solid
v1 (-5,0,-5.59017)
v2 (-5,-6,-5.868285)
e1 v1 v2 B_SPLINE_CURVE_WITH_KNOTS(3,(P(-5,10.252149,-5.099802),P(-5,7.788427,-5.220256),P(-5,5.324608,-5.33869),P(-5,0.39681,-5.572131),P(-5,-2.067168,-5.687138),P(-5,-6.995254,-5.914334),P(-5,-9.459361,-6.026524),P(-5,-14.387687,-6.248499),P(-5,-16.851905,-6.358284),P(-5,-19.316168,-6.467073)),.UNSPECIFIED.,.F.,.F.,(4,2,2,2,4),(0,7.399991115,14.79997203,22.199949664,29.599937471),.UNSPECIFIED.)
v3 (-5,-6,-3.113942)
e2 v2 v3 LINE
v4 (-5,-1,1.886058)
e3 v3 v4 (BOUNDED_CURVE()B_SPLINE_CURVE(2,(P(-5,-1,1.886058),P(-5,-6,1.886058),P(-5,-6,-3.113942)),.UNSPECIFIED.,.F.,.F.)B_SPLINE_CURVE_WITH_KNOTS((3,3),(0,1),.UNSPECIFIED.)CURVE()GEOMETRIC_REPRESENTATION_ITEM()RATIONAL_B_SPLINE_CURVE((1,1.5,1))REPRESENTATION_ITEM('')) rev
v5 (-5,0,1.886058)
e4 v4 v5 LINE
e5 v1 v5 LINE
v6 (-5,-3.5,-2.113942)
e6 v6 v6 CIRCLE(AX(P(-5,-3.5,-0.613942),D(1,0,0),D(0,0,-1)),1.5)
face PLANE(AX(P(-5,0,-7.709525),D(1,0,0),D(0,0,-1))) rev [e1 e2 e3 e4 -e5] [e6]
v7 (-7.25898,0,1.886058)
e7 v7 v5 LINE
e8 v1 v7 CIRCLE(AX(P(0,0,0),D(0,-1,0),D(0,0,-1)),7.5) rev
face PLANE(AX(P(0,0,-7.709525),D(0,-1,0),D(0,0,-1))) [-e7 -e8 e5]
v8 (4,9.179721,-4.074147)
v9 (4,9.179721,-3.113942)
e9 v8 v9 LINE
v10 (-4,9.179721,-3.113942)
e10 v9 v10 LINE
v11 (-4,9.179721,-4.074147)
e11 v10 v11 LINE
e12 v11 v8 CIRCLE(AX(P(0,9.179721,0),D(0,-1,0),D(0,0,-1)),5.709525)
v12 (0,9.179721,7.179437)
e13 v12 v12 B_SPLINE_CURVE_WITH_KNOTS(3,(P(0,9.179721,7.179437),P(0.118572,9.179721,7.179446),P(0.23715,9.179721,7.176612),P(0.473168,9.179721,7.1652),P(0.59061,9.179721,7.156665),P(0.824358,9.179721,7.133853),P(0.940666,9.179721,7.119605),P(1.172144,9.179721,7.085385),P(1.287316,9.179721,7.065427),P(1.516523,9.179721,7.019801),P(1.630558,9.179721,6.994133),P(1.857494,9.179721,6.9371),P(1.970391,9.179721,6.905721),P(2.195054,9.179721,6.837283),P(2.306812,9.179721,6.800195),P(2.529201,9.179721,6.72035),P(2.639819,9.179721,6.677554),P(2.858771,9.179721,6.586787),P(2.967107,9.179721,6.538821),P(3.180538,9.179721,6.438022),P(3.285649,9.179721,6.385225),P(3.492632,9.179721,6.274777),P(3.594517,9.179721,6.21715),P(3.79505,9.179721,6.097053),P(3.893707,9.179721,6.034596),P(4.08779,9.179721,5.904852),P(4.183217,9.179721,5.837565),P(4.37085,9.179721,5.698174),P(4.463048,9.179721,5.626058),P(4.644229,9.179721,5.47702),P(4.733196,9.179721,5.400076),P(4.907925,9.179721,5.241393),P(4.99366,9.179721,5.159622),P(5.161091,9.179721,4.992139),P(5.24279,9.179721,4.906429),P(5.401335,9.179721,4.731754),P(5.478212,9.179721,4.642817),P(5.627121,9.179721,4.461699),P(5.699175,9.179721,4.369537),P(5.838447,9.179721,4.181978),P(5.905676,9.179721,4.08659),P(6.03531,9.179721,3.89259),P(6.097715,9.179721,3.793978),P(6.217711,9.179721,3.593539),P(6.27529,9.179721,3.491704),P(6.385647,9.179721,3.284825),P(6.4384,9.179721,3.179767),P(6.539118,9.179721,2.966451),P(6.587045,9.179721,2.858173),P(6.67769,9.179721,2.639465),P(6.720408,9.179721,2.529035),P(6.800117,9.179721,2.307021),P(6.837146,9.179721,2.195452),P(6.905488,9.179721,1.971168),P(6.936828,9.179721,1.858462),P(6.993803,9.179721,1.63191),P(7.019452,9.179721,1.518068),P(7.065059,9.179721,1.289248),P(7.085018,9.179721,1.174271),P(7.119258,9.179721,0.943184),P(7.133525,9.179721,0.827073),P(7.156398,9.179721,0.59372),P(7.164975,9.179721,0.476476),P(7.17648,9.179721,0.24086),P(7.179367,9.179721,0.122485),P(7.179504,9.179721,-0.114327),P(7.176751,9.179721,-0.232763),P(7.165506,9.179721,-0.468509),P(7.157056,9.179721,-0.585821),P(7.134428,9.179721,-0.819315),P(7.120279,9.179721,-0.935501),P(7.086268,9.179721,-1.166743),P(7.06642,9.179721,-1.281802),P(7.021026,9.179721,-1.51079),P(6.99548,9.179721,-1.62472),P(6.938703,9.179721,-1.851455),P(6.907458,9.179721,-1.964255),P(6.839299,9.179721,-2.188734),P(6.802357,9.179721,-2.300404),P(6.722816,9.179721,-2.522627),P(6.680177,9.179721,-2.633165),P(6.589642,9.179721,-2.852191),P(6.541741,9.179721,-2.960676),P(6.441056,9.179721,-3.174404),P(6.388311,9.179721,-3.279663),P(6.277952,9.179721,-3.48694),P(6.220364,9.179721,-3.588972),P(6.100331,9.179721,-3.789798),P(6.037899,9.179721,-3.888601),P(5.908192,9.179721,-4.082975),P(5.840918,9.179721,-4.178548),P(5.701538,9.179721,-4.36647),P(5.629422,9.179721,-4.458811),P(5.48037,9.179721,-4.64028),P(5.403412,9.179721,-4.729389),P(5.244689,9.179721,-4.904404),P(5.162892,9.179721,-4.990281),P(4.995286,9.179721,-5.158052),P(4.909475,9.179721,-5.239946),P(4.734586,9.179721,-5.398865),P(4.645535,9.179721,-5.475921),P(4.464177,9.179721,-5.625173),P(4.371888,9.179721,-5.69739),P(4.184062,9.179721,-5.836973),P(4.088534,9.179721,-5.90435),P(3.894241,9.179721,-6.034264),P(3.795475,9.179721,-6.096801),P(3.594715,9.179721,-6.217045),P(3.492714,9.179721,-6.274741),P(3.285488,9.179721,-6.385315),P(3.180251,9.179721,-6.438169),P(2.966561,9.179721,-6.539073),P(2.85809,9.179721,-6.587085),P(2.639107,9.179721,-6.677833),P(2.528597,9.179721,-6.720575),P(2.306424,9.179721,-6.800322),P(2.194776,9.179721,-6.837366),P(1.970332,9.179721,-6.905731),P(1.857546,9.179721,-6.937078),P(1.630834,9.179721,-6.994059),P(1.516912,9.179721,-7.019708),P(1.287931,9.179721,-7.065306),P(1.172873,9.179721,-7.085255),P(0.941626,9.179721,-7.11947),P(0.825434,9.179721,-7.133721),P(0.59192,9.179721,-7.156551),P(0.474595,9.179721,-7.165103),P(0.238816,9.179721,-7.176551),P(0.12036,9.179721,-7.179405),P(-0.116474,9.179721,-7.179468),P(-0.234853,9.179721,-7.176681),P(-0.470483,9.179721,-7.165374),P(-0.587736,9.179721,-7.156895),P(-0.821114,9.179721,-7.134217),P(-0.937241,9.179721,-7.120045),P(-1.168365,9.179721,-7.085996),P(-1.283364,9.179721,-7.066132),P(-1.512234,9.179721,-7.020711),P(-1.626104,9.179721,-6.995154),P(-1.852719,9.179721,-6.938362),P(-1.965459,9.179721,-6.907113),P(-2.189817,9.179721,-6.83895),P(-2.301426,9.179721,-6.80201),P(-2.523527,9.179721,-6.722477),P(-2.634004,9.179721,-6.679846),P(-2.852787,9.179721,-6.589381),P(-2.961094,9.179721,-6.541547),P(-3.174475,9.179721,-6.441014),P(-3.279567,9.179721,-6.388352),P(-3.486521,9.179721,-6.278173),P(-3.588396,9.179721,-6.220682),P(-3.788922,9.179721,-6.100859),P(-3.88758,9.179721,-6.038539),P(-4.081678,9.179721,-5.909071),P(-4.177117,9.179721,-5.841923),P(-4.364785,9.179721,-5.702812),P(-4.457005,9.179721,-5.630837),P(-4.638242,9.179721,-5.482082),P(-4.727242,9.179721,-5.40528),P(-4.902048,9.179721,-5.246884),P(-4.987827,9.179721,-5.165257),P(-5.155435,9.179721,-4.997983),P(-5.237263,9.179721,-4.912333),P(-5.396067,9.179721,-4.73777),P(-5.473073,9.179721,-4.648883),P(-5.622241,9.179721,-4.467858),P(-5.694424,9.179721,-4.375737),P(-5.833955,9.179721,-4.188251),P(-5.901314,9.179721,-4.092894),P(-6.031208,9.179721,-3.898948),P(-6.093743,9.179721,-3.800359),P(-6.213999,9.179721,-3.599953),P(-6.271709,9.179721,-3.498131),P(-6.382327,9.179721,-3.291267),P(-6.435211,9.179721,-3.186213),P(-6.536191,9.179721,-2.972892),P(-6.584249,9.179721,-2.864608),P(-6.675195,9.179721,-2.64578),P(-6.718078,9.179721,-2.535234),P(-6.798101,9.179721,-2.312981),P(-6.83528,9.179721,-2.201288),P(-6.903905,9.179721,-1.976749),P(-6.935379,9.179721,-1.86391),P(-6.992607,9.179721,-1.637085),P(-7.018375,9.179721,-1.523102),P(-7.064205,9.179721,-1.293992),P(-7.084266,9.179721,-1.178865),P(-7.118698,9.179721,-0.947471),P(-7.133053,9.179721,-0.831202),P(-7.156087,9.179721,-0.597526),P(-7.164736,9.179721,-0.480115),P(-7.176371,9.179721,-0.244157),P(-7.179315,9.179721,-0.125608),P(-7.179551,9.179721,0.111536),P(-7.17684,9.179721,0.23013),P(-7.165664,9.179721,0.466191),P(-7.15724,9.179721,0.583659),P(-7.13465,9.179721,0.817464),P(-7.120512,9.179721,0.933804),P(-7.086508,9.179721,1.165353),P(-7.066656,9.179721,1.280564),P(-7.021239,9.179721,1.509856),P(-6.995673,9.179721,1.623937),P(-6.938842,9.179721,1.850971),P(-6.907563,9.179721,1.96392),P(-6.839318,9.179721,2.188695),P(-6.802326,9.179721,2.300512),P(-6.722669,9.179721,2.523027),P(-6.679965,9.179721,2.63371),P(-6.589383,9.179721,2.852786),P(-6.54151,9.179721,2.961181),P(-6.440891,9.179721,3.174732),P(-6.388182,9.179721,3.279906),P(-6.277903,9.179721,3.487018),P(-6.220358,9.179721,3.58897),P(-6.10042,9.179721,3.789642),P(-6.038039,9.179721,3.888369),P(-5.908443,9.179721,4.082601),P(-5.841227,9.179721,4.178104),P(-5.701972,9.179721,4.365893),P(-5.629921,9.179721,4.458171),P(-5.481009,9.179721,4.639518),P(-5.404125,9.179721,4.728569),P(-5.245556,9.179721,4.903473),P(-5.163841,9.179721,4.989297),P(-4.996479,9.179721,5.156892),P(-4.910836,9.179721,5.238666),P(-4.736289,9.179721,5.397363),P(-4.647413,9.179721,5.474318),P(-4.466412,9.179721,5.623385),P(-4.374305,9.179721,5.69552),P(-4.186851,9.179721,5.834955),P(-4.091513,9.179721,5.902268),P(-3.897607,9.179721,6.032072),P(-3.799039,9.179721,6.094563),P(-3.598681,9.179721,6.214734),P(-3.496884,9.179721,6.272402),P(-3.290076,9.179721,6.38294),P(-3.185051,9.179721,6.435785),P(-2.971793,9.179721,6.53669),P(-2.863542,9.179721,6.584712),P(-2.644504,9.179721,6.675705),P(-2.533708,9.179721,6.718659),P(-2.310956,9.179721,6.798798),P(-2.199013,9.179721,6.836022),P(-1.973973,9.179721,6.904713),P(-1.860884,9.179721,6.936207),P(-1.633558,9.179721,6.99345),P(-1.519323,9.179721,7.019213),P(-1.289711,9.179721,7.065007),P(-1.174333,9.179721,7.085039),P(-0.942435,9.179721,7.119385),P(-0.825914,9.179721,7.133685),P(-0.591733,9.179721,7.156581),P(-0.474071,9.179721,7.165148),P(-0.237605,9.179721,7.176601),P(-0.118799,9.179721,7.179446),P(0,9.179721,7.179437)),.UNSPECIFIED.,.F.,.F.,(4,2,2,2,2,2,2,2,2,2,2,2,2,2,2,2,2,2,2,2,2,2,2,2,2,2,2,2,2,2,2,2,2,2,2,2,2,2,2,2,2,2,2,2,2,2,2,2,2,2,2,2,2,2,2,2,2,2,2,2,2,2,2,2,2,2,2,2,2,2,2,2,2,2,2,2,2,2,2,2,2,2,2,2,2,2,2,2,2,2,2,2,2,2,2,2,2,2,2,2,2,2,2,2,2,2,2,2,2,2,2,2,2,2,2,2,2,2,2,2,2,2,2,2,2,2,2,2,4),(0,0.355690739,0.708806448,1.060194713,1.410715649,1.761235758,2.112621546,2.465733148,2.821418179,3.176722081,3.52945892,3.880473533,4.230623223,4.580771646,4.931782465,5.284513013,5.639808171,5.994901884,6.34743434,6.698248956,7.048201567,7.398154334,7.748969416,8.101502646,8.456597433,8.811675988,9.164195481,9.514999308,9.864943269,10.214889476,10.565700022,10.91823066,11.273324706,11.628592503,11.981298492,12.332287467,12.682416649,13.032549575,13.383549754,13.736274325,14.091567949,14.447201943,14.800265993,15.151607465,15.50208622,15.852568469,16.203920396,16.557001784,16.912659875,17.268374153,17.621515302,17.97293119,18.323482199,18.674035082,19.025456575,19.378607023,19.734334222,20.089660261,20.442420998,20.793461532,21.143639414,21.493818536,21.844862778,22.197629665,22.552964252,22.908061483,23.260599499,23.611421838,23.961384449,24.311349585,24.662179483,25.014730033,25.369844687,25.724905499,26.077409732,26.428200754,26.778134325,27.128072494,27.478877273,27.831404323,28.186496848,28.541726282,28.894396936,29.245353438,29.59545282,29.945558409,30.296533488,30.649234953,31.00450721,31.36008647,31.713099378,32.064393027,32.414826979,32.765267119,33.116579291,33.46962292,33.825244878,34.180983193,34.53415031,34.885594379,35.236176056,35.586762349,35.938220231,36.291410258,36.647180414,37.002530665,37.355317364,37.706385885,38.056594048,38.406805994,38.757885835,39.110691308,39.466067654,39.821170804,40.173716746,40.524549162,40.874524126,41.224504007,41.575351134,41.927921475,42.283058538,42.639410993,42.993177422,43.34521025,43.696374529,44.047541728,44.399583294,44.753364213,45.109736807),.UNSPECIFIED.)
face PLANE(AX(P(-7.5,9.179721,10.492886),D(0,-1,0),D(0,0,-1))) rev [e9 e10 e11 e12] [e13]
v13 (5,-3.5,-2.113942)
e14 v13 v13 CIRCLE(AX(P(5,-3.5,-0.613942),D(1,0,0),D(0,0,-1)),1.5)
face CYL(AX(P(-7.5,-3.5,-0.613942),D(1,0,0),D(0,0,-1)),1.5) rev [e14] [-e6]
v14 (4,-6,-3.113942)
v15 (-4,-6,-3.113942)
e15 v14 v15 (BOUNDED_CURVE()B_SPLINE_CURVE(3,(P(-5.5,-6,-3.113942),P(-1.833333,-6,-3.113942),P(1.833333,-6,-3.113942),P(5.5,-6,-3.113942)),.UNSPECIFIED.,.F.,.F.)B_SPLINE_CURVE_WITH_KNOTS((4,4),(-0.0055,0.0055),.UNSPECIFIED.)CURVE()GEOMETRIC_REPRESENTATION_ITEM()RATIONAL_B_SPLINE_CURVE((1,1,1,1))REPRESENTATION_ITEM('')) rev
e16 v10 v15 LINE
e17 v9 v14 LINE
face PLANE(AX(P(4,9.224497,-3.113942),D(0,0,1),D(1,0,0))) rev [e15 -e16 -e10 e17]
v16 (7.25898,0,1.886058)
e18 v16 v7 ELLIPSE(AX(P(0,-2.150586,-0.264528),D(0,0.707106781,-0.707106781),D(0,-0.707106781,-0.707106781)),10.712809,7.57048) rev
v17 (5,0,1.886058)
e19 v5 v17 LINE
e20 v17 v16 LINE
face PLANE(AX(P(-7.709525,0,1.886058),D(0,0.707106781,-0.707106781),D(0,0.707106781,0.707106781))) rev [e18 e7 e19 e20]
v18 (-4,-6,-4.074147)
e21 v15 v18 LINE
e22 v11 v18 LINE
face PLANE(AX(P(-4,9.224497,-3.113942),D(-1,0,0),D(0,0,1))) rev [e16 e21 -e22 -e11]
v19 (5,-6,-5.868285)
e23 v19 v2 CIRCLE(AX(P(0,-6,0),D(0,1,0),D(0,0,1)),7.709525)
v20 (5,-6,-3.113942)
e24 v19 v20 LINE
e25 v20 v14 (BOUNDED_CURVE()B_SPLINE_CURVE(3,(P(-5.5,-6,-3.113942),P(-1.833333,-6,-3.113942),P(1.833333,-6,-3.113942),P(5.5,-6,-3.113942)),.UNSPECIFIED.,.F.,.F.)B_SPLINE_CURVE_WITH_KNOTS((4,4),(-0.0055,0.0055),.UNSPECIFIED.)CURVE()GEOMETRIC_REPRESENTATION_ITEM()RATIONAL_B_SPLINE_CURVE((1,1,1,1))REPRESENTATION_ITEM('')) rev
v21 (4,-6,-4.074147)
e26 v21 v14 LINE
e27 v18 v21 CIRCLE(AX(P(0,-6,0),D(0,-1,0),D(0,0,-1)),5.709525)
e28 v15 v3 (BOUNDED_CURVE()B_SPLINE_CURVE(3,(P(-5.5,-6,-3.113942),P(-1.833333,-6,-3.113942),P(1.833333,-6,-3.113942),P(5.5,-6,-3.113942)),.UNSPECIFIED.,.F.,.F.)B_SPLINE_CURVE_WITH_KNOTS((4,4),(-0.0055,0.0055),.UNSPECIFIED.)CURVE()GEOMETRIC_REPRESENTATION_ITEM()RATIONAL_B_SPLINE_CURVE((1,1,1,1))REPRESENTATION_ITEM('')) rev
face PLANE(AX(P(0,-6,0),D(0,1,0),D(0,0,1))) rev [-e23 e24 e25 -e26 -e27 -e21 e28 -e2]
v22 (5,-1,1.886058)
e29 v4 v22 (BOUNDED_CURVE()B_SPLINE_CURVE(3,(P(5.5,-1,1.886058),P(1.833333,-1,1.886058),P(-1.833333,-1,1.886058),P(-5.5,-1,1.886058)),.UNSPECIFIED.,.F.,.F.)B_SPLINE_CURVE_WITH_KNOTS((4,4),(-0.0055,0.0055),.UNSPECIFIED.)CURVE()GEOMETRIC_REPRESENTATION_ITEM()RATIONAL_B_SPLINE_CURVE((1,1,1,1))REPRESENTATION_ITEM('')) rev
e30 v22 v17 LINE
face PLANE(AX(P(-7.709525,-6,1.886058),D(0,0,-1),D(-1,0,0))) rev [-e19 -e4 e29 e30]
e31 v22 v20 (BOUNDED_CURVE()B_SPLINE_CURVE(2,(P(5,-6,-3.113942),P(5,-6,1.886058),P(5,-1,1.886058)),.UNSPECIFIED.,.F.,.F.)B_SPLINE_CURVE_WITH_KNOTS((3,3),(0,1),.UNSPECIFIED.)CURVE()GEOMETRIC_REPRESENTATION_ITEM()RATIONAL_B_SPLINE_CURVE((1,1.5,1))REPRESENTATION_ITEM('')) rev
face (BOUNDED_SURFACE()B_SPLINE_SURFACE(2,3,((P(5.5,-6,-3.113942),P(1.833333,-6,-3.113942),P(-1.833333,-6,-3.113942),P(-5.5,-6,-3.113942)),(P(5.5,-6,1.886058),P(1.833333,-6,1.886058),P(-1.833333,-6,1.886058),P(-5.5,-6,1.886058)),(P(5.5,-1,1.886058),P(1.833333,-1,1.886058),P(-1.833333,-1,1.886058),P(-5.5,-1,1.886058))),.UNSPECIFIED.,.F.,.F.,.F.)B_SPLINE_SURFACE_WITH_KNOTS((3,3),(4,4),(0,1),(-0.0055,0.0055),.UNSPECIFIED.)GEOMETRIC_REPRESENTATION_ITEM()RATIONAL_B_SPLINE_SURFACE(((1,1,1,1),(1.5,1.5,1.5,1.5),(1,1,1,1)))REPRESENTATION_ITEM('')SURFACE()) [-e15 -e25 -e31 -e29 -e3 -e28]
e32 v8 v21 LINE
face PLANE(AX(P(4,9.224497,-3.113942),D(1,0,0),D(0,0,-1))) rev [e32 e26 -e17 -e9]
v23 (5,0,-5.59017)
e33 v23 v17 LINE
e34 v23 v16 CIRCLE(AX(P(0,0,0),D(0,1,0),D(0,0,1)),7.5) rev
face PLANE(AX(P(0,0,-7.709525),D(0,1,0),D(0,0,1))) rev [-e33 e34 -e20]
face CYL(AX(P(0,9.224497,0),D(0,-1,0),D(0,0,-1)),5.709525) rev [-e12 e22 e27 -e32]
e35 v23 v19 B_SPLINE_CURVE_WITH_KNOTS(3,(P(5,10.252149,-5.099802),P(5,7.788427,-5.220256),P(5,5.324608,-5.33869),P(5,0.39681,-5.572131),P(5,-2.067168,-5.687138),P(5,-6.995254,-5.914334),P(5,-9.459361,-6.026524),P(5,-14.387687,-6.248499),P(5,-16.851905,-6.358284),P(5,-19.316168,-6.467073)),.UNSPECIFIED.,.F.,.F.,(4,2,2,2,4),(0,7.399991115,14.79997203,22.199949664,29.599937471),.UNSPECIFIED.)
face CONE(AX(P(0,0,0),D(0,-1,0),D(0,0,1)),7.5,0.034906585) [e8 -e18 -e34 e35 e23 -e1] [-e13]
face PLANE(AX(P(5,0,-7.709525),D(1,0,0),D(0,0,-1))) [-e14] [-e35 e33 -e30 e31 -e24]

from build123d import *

# Parameters (mm, degrees)
SKETCH1_R                     = 7.5
BOSS_EXTRUDE1_DEPTH           = 19
BOSS_EXTRUDE1_TAPER           = 2
BOSS_EXTRUDE1_OTHER_WAY_DEPTH = 6
BOSS_EXTRUDE1_OTHER_WAY_TAPER = -2
CUT_EXTRUDE1_DEPTH            = 22.90601606
CUT_EXTRUDE1_DEPTH_BACK       = 22.90601606
CUT_EXTRUDE2_START            = -9.595582485
CUT_EXTRUDE2_OUTLINE_W        = 6.502745185
CUT_EXTRUDE2_OUTLINE_H        = 6
CUT_EXTRUDE2_DEPTH            = 9.595582485
SKETCH5_R                     = 1.5
CUT_EXTRUDE3_DEPTH            = 25.014303442
FILLET1_SIZE                  = 5
CUT_EXTRUDE4_DEPTH            = 22.833157665
CUT_EXTRUDE4_DEPTH_BACK       = 22.833157665
SKETCH6_W                     = 18.67842866
SKETCH6_H                     = 10.820279471
CUT_EXTRUDE5_DEPTH            = 19.604050317


with BuildPart() as part:
    # Sketch1 → Boss-Extrude1 (new body)
    with BuildSketch(Plane(origin=(0, 0, 0), x_dir=(1, 0, 0), z_dir=(0, 1, 0))):
        Circle(SKETCH1_R)
    extrude(amount=BOSS_EXTRUDE1_DEPTH, taper=BOSS_EXTRUDE1_TAPER)

    # Sketch1 → Boss-Extrude1 other way (add)
    with BuildSketch(Plane(origin=(0, 0, 0), x_dir=(1, 0, 0), z_dir=(0, 1, 0))):
        Circle(SKETCH1_R)
    extrude(amount=-BOSS_EXTRUDE1_OTHER_WAY_DEPTH, taper=BOSS_EXTRUDE1_OTHER_WAY_TAPER)

    # Sketch3 → Cut-Extrude1 (cut, two sides: drawn at the far end of the back side and taken through both)
    with BuildSketch(Plane(origin=(0, 0, 0), x_dir=(0, 0, -1), z_dir=(1, 0, 0)).offset(-CUT_EXTRUDE1_DEPTH_BACK)):
        Polygon((-1.886057768, -6), (-1.886057768, 0), (-9.929766736, 8.043708969), (-9.929766736, -6), align=None)
    extrude(amount=CUT_EXTRUDE1_DEPTH + CUT_EXTRUDE1_DEPTH_BACK, mode=Mode.SUBTRACT)

    # Cut-Extrude2: read off the stored shape, not the designer's step
    # Cut-Extrude2 outline → Cut-Extrude2 (cut)
    with BuildSketch(Plane.XY.offset(1.886057768).offset(CUT_EXTRUDE2_START)):
        with Locations((-8.251372593, -3)):
            Rectangle(CUT_EXTRUDE2_OUTLINE_W, CUT_EXTRUDE2_OUTLINE_H)
        with Locations((8.251372593, -3)):
            Rectangle(CUT_EXTRUDE2_OUTLINE_W, CUT_EXTRUDE2_OUTLINE_H)
    extrude(amount=CUT_EXTRUDE2_DEPTH, mode=Mode.SUBTRACT)

    # Sketch5 → Cut-Extrude3 (cut, through all)
    with BuildSketch(Plane(origin=(5, 0, 0), x_dir=(0, 0, -1), z_dir=(1, 0, 0))):
        with Locations((0.613942232, -3.5)):
            Circle(SKETCH5_R)
    extrude(amount=-CUT_EXTRUDE3_DEPTH, mode=Mode.SUBTRACT)

    # Fillet1
    # a fillet whose section is not a circle: 5 mm, written as the material it takes off along each edge
    with BuildSketch(Plane(origin=(17.5, -6, 1.886057768), x_dir=(0, 0, -1), z_dir=(-1, 0, 0))) as fillet1_piece_1:
        with BuildLine():
            Bezier((FILLET1_SIZE, 0), (0, 0), (0, -FILLET1_SIZE), weights=[1, 1.5, 1])
            Line((0, -FILLET1_SIZE), (0, 0))
            Line((0, 0), (FILLET1_SIZE, 0))
        make_face()
    extrude(amount=35, mode=Mode.SUBTRACT)

    # Fillet2
    # a fillet whose section is not a circle: 10, 5 mm, written as the material it takes off along each edge
    with BuildSketch(Plane(origin=(0, 19, 0), x_dir=(1, 0, 0), z_dir=(0, 0, -1))) as fillet2_piece_1:
        with BuildLine():
            Bezier((7.179619488, 9.825502516), (6.83650538, 0), (2.182665353, 0), weights=[1, 0.818181818, 1])
            Line((2.182665353, 0), (6.83650538, 0))
            Line((6.83650538, 0), (7.179619488, 9.825502516))
        make_face()
    revolve(axis=Axis((0, 19, 0), (0, -1, 0)), mode=Mode.SUBTRACT)

    # Sketch6 → Cut-Extrude4 (cut, two sides: drawn at the far end of the back side and taken through both)
    with BuildSketch(Plane(origin=(0, 0, 0), x_dir=(0, 0, -1), z_dir=(1, 0, 0)).offset(-CUT_EXTRUDE4_DEPTH_BACK)):
        with Locations((-1.153671222, 14.589860265)):
            Rectangle(SKETCH6_W, SKETCH6_H)
    extrude(amount=CUT_EXTRUDE4_DEPTH + CUT_EXTRUDE4_DEPTH_BACK, mode=Mode.SUBTRACT)

    # Sketch7 → Cut-Extrude5 (cut, through all)
    with BuildSketch(Plane.XZ.offset(6)):
        with BuildLine():
            Line((4, -3.113942232), (4, -4.074146702))
            ThreePointArc((4, -4.074146702), (0, -5.709524617), (-4, -4.074146702))
            Line((-4, -4.074146702), (-4, -3.113942232))
            Line((-4, -3.113942232), (4, -3.113942232))
        make_face()
    extrude(amount=-CUT_EXTRUDE5_DEPTH, mode=Mode.SUBTRACT)


solid = part.part
